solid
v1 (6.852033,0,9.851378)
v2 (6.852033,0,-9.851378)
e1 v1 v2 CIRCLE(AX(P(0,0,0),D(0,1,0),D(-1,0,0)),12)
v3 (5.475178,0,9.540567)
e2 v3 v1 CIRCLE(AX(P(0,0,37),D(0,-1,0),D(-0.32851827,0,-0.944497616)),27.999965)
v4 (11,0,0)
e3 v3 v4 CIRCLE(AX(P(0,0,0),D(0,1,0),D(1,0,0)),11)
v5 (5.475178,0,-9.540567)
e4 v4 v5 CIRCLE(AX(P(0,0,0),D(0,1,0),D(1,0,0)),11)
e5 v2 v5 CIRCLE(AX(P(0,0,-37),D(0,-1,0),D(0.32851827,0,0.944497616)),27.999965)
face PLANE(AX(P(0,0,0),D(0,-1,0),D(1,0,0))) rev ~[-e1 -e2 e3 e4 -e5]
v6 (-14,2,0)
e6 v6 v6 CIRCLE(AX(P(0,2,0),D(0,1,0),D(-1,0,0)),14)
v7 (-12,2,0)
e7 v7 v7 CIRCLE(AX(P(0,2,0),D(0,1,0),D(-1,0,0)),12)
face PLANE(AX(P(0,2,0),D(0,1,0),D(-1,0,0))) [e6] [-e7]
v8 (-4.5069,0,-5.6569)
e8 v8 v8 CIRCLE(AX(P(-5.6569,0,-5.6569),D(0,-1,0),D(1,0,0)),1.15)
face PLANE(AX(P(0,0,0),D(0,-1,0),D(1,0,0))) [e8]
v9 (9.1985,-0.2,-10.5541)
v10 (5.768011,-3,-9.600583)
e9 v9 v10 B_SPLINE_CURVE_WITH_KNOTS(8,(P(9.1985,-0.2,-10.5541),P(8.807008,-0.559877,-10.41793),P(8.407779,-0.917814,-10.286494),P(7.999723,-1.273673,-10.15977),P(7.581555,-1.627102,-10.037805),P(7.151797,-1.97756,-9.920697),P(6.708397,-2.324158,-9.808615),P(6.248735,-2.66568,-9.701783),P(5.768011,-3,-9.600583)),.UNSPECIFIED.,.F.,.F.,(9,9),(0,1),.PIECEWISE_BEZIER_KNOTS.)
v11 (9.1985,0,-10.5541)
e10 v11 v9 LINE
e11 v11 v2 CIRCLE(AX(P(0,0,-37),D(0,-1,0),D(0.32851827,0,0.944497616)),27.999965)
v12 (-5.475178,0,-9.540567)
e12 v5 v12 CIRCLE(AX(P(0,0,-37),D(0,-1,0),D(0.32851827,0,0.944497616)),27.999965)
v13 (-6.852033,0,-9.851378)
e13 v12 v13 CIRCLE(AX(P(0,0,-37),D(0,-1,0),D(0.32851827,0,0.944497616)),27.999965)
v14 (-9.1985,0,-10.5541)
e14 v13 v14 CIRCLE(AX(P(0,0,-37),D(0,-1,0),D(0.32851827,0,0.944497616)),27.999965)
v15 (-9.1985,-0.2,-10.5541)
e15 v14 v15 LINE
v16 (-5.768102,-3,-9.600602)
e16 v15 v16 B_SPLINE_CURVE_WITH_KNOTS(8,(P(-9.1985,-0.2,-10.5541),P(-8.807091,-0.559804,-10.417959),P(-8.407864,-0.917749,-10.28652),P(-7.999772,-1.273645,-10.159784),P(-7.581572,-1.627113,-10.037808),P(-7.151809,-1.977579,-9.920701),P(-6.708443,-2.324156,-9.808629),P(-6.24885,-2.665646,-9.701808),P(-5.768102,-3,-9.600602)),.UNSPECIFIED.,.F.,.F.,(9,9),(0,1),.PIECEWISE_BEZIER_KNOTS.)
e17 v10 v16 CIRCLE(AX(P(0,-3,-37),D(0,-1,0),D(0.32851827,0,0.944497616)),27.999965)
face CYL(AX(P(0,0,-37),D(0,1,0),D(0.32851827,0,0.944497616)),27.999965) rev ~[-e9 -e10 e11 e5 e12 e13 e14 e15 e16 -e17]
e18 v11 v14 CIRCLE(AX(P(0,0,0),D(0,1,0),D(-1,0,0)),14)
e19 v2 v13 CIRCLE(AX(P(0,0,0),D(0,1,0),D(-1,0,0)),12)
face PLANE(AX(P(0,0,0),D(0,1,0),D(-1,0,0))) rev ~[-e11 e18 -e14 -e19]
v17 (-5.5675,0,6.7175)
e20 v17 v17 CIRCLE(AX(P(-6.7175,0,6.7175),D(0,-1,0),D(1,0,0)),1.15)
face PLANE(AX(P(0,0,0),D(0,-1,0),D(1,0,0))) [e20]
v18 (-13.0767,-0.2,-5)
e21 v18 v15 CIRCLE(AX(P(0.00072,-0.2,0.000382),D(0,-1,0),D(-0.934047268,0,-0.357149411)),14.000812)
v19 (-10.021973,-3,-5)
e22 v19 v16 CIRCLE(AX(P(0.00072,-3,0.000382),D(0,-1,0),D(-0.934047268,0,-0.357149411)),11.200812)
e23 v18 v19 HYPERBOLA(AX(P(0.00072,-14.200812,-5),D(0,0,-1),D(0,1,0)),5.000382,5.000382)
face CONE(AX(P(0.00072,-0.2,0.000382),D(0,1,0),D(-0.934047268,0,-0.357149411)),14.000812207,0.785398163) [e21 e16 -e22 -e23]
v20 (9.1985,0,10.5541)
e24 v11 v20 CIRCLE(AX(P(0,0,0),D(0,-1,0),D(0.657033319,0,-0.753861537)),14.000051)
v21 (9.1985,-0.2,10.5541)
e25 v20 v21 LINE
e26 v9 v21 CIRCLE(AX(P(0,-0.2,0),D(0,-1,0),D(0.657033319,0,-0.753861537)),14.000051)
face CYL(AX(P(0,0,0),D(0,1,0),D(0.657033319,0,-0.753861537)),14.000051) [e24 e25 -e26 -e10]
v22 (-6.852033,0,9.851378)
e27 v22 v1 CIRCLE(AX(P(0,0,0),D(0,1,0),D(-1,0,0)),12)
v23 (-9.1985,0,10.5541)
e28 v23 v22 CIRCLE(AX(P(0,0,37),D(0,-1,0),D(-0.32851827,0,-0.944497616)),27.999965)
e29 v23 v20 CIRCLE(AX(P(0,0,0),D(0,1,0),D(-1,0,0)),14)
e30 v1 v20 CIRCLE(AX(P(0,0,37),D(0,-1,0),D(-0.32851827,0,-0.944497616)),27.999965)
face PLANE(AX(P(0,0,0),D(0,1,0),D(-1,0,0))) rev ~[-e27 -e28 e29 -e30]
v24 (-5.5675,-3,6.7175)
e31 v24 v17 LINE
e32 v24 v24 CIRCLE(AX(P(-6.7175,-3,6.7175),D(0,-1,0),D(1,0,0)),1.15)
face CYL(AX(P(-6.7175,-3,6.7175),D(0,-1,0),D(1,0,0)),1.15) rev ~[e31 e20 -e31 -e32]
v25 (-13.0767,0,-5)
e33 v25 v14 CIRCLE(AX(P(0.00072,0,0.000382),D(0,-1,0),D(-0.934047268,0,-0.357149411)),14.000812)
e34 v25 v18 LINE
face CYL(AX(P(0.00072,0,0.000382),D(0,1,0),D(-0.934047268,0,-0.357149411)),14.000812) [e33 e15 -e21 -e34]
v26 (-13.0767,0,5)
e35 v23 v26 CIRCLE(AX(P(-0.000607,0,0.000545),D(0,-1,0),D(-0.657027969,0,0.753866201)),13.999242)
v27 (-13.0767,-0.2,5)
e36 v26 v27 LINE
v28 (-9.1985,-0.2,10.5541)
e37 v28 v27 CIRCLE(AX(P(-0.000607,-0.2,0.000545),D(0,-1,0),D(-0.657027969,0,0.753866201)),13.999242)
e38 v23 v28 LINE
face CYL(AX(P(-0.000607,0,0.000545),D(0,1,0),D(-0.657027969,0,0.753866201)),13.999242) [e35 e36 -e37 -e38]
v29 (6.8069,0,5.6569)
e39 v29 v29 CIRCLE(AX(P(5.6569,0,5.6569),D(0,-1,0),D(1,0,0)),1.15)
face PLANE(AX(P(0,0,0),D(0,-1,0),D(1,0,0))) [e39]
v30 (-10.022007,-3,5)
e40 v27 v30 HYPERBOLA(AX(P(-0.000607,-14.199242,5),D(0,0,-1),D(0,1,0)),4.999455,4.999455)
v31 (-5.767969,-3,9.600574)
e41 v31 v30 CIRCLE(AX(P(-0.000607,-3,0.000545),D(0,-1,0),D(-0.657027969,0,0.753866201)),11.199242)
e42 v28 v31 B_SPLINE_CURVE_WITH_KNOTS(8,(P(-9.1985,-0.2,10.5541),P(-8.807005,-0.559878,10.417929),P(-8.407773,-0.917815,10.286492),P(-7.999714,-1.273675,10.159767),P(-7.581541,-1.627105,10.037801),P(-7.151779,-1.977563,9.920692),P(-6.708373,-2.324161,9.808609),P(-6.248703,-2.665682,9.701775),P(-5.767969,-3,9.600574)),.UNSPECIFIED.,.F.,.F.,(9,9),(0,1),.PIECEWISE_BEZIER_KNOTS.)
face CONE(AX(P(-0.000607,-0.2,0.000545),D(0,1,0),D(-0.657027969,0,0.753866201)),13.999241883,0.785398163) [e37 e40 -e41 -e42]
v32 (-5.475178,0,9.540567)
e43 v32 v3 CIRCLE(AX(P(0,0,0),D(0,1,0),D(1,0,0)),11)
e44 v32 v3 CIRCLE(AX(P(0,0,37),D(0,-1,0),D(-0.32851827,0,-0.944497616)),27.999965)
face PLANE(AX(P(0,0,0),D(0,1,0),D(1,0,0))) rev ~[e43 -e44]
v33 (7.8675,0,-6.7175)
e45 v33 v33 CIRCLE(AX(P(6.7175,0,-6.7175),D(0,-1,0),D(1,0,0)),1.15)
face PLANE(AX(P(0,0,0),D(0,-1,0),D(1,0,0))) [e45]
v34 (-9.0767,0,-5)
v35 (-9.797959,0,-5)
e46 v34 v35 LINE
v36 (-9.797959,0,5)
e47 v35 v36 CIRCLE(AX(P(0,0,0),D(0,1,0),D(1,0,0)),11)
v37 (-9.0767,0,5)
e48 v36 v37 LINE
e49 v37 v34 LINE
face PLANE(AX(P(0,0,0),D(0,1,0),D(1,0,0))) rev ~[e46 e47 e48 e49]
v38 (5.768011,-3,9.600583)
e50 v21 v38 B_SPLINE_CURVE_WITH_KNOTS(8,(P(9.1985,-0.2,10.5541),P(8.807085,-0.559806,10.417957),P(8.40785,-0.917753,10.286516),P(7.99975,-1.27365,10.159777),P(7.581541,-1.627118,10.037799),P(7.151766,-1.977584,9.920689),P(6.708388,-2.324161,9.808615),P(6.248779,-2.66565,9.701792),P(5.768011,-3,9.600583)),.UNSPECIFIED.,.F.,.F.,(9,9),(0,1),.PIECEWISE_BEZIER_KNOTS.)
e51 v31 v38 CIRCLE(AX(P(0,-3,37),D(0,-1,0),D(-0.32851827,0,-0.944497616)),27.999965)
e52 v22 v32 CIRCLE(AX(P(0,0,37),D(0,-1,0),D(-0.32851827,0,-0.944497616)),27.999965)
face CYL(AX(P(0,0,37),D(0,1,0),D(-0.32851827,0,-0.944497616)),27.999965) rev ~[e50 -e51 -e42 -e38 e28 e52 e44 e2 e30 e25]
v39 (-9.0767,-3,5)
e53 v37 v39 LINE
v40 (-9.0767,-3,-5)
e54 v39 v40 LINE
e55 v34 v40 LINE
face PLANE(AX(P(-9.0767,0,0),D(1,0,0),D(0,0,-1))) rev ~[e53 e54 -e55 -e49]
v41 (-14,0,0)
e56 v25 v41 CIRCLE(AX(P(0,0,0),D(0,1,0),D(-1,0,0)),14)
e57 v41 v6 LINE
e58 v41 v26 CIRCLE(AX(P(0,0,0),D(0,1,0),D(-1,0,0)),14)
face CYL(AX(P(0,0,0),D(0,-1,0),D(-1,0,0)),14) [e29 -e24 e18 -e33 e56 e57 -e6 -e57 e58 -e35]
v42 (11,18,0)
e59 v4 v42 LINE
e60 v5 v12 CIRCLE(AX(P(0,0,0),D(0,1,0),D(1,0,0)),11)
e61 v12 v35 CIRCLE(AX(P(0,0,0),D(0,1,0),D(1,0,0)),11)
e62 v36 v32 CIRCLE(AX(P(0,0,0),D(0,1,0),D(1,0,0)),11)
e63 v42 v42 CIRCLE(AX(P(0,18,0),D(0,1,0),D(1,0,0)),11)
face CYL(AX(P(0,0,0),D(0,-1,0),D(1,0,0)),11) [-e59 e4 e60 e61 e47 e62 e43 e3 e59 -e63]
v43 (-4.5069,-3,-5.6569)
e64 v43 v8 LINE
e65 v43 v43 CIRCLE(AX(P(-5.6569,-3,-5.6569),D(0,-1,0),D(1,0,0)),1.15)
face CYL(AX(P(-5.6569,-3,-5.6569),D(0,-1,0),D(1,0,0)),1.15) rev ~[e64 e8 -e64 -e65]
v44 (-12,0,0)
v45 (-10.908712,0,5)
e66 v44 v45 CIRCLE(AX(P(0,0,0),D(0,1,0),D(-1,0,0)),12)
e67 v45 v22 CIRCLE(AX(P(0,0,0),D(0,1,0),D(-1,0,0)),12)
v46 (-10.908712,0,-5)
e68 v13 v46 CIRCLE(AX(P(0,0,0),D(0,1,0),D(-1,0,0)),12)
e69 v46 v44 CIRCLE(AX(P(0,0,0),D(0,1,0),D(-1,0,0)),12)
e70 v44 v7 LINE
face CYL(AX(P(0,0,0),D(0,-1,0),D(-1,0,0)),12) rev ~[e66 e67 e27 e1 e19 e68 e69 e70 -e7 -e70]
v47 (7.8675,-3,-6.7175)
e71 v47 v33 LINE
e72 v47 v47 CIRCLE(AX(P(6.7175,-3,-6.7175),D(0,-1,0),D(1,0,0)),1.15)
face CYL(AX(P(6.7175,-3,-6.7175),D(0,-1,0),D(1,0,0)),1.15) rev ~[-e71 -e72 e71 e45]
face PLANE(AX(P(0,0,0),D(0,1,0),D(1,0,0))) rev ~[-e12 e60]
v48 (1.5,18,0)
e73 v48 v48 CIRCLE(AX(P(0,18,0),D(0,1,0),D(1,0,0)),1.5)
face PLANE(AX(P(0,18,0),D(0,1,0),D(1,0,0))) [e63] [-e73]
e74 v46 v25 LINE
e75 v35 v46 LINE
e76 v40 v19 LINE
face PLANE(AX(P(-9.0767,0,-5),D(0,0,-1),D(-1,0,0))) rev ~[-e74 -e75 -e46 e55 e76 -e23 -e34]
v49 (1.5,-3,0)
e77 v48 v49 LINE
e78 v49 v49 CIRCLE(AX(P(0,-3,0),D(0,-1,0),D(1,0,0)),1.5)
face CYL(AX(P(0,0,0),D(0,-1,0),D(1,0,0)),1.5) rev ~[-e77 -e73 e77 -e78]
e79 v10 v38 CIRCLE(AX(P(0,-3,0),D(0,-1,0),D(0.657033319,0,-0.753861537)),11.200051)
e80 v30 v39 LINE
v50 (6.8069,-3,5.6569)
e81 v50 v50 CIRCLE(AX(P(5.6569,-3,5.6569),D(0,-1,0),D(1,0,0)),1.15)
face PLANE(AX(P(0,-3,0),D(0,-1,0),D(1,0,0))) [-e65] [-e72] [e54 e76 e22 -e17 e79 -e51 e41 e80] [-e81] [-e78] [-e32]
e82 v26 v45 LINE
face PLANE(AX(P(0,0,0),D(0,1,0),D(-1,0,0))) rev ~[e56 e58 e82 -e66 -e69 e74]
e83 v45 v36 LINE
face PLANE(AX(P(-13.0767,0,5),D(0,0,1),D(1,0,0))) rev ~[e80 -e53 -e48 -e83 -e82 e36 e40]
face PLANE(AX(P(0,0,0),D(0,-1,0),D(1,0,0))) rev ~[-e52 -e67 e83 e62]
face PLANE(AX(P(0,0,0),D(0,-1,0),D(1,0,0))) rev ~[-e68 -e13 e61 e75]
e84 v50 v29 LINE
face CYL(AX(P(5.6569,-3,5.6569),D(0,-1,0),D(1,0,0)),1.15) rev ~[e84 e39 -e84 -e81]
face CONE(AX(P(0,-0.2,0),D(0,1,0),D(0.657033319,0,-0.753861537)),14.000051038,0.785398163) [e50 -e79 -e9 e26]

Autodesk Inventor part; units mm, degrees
ref_plane "YZ Plane" through (0, 0, 0) normal (1, 0, 0) x (0, 1, 0)
ref_plane "XZ Plane" through (0, 0, 0) normal (0, 1, 0) x (-1, 0, 0)
ref_plane "XY Plane" through (0, 0, 0) normal (0, 0, 1) x (1, 0, 0)
sketch "Sketch1" plane through (0, 0, 0) normal (0, 1, 0) x (-1, 0, 0)
  circle A0 centre (0, 0) radius 14
  circle A1 centre (0, 0) radius 12
  dimension "d0" = 28
  dimension "d1" = 2
extrude "Extrusion1" add sketch "Sketch1" along normal blind 2
sketch "Sketch2" plane through (0, 0, 0) normal (0, -1, 0) x (1, 0, 0)
  line L0 (0, 0) -> (0, -37) construction
  arc A0 (9.1985, -10.5541) -> (-9.1985, -10.5541) centre (0, -37) ccw
  line L1 (0, 0) -> (0, 37) construction
  arc A1 (-9.1985, 10.5541) -> (9.1985, 10.5541) centre (0, 37) ccw
  line L2 (-13.0767, 5) -> (-9.0767, 5)
  line L3 (-9.0767, 5) -> (-9.0767, -5)
  line L4 (-9.0767, -5) -> (-13.0767, -5)
  line L5 (-7.8662, 0) -> (-7.8662, -5) construction
  arc A2 (9.1985, -10.5541) -> (9.1985, 10.5541) centre (0, 0) ccw
  arc A3 (-9.1985, 10.5541) -> (-13.0767, 5) centre (0, 0) ccw
  arc A4 (-13.0767, -5) -> (-9.1985, -10.5541) centre (0, 0) ccw
  line L6 (0, 0) -> (-9.0767, 0)
  dimension "d8" = 56
  dimension "d10" = 37
  dimension "d11" = 5
  dimension "d12" = 4
extrude "Extrusion2" add sketch "Sketch2" along normal blind 3
sketch "Sketch3" plane through (0, -3, 0) normal (0, -1, 0) x (1, 0, 0)
  circle A0 centre (0, 0) radius 1.5
  dimension "d15" = 3
extrude "Extrusion3" cut sketch "Sketch3" against normal through all
chamfer "Chamfer1" distance 2.8 angle 45 3 edges at (-11.4786, -3, -8.0151) (-11.4786, -3, 8.0151) (14, -3, 0)
sketch "Sketch4" plane through (0, 0, 0) normal (0, 1, 0) x (1, 0, 0)
  circle A0 centre (0, 0) radius 1.5
  circle A1 centre (0, 0) radius 11
  dimension "d21" = 22
  dimension "d22" = 3
extrude "Extrusion4" add sketch "Sketch4" along normal blind 18
sketch3d "Sketch6"
sketch " Sketch6" plane through (0, -3, 0) normal (0, -1, 0) x (1, 0, 0)
  line L0 (-6.7175, 6.7175) -> (6.7175, -6.7175) construction
  line L1 (5.6569, 5.6569) -> (-5.6569, -5.6569) construction
  circle A0 centre (-5.6569, -5.6569) radius 1.15
  circle A1 centre (6.7175, -6.7175) radius 1.15
  circle A2 centre (-6.7175, 6.7175) radius 1.15
  circle A3 centre (5.6569, 5.6569) radius 1.15
  circle A4 centre (0, 0) radius 1.5 construction
  line L2 (0, 0) -> (31.4092, 0) construction
extrude "Extrusion5" cut sketch " Sketch6" against normal up to surface (3 mm away)
properties part number "BrushlessInner"
